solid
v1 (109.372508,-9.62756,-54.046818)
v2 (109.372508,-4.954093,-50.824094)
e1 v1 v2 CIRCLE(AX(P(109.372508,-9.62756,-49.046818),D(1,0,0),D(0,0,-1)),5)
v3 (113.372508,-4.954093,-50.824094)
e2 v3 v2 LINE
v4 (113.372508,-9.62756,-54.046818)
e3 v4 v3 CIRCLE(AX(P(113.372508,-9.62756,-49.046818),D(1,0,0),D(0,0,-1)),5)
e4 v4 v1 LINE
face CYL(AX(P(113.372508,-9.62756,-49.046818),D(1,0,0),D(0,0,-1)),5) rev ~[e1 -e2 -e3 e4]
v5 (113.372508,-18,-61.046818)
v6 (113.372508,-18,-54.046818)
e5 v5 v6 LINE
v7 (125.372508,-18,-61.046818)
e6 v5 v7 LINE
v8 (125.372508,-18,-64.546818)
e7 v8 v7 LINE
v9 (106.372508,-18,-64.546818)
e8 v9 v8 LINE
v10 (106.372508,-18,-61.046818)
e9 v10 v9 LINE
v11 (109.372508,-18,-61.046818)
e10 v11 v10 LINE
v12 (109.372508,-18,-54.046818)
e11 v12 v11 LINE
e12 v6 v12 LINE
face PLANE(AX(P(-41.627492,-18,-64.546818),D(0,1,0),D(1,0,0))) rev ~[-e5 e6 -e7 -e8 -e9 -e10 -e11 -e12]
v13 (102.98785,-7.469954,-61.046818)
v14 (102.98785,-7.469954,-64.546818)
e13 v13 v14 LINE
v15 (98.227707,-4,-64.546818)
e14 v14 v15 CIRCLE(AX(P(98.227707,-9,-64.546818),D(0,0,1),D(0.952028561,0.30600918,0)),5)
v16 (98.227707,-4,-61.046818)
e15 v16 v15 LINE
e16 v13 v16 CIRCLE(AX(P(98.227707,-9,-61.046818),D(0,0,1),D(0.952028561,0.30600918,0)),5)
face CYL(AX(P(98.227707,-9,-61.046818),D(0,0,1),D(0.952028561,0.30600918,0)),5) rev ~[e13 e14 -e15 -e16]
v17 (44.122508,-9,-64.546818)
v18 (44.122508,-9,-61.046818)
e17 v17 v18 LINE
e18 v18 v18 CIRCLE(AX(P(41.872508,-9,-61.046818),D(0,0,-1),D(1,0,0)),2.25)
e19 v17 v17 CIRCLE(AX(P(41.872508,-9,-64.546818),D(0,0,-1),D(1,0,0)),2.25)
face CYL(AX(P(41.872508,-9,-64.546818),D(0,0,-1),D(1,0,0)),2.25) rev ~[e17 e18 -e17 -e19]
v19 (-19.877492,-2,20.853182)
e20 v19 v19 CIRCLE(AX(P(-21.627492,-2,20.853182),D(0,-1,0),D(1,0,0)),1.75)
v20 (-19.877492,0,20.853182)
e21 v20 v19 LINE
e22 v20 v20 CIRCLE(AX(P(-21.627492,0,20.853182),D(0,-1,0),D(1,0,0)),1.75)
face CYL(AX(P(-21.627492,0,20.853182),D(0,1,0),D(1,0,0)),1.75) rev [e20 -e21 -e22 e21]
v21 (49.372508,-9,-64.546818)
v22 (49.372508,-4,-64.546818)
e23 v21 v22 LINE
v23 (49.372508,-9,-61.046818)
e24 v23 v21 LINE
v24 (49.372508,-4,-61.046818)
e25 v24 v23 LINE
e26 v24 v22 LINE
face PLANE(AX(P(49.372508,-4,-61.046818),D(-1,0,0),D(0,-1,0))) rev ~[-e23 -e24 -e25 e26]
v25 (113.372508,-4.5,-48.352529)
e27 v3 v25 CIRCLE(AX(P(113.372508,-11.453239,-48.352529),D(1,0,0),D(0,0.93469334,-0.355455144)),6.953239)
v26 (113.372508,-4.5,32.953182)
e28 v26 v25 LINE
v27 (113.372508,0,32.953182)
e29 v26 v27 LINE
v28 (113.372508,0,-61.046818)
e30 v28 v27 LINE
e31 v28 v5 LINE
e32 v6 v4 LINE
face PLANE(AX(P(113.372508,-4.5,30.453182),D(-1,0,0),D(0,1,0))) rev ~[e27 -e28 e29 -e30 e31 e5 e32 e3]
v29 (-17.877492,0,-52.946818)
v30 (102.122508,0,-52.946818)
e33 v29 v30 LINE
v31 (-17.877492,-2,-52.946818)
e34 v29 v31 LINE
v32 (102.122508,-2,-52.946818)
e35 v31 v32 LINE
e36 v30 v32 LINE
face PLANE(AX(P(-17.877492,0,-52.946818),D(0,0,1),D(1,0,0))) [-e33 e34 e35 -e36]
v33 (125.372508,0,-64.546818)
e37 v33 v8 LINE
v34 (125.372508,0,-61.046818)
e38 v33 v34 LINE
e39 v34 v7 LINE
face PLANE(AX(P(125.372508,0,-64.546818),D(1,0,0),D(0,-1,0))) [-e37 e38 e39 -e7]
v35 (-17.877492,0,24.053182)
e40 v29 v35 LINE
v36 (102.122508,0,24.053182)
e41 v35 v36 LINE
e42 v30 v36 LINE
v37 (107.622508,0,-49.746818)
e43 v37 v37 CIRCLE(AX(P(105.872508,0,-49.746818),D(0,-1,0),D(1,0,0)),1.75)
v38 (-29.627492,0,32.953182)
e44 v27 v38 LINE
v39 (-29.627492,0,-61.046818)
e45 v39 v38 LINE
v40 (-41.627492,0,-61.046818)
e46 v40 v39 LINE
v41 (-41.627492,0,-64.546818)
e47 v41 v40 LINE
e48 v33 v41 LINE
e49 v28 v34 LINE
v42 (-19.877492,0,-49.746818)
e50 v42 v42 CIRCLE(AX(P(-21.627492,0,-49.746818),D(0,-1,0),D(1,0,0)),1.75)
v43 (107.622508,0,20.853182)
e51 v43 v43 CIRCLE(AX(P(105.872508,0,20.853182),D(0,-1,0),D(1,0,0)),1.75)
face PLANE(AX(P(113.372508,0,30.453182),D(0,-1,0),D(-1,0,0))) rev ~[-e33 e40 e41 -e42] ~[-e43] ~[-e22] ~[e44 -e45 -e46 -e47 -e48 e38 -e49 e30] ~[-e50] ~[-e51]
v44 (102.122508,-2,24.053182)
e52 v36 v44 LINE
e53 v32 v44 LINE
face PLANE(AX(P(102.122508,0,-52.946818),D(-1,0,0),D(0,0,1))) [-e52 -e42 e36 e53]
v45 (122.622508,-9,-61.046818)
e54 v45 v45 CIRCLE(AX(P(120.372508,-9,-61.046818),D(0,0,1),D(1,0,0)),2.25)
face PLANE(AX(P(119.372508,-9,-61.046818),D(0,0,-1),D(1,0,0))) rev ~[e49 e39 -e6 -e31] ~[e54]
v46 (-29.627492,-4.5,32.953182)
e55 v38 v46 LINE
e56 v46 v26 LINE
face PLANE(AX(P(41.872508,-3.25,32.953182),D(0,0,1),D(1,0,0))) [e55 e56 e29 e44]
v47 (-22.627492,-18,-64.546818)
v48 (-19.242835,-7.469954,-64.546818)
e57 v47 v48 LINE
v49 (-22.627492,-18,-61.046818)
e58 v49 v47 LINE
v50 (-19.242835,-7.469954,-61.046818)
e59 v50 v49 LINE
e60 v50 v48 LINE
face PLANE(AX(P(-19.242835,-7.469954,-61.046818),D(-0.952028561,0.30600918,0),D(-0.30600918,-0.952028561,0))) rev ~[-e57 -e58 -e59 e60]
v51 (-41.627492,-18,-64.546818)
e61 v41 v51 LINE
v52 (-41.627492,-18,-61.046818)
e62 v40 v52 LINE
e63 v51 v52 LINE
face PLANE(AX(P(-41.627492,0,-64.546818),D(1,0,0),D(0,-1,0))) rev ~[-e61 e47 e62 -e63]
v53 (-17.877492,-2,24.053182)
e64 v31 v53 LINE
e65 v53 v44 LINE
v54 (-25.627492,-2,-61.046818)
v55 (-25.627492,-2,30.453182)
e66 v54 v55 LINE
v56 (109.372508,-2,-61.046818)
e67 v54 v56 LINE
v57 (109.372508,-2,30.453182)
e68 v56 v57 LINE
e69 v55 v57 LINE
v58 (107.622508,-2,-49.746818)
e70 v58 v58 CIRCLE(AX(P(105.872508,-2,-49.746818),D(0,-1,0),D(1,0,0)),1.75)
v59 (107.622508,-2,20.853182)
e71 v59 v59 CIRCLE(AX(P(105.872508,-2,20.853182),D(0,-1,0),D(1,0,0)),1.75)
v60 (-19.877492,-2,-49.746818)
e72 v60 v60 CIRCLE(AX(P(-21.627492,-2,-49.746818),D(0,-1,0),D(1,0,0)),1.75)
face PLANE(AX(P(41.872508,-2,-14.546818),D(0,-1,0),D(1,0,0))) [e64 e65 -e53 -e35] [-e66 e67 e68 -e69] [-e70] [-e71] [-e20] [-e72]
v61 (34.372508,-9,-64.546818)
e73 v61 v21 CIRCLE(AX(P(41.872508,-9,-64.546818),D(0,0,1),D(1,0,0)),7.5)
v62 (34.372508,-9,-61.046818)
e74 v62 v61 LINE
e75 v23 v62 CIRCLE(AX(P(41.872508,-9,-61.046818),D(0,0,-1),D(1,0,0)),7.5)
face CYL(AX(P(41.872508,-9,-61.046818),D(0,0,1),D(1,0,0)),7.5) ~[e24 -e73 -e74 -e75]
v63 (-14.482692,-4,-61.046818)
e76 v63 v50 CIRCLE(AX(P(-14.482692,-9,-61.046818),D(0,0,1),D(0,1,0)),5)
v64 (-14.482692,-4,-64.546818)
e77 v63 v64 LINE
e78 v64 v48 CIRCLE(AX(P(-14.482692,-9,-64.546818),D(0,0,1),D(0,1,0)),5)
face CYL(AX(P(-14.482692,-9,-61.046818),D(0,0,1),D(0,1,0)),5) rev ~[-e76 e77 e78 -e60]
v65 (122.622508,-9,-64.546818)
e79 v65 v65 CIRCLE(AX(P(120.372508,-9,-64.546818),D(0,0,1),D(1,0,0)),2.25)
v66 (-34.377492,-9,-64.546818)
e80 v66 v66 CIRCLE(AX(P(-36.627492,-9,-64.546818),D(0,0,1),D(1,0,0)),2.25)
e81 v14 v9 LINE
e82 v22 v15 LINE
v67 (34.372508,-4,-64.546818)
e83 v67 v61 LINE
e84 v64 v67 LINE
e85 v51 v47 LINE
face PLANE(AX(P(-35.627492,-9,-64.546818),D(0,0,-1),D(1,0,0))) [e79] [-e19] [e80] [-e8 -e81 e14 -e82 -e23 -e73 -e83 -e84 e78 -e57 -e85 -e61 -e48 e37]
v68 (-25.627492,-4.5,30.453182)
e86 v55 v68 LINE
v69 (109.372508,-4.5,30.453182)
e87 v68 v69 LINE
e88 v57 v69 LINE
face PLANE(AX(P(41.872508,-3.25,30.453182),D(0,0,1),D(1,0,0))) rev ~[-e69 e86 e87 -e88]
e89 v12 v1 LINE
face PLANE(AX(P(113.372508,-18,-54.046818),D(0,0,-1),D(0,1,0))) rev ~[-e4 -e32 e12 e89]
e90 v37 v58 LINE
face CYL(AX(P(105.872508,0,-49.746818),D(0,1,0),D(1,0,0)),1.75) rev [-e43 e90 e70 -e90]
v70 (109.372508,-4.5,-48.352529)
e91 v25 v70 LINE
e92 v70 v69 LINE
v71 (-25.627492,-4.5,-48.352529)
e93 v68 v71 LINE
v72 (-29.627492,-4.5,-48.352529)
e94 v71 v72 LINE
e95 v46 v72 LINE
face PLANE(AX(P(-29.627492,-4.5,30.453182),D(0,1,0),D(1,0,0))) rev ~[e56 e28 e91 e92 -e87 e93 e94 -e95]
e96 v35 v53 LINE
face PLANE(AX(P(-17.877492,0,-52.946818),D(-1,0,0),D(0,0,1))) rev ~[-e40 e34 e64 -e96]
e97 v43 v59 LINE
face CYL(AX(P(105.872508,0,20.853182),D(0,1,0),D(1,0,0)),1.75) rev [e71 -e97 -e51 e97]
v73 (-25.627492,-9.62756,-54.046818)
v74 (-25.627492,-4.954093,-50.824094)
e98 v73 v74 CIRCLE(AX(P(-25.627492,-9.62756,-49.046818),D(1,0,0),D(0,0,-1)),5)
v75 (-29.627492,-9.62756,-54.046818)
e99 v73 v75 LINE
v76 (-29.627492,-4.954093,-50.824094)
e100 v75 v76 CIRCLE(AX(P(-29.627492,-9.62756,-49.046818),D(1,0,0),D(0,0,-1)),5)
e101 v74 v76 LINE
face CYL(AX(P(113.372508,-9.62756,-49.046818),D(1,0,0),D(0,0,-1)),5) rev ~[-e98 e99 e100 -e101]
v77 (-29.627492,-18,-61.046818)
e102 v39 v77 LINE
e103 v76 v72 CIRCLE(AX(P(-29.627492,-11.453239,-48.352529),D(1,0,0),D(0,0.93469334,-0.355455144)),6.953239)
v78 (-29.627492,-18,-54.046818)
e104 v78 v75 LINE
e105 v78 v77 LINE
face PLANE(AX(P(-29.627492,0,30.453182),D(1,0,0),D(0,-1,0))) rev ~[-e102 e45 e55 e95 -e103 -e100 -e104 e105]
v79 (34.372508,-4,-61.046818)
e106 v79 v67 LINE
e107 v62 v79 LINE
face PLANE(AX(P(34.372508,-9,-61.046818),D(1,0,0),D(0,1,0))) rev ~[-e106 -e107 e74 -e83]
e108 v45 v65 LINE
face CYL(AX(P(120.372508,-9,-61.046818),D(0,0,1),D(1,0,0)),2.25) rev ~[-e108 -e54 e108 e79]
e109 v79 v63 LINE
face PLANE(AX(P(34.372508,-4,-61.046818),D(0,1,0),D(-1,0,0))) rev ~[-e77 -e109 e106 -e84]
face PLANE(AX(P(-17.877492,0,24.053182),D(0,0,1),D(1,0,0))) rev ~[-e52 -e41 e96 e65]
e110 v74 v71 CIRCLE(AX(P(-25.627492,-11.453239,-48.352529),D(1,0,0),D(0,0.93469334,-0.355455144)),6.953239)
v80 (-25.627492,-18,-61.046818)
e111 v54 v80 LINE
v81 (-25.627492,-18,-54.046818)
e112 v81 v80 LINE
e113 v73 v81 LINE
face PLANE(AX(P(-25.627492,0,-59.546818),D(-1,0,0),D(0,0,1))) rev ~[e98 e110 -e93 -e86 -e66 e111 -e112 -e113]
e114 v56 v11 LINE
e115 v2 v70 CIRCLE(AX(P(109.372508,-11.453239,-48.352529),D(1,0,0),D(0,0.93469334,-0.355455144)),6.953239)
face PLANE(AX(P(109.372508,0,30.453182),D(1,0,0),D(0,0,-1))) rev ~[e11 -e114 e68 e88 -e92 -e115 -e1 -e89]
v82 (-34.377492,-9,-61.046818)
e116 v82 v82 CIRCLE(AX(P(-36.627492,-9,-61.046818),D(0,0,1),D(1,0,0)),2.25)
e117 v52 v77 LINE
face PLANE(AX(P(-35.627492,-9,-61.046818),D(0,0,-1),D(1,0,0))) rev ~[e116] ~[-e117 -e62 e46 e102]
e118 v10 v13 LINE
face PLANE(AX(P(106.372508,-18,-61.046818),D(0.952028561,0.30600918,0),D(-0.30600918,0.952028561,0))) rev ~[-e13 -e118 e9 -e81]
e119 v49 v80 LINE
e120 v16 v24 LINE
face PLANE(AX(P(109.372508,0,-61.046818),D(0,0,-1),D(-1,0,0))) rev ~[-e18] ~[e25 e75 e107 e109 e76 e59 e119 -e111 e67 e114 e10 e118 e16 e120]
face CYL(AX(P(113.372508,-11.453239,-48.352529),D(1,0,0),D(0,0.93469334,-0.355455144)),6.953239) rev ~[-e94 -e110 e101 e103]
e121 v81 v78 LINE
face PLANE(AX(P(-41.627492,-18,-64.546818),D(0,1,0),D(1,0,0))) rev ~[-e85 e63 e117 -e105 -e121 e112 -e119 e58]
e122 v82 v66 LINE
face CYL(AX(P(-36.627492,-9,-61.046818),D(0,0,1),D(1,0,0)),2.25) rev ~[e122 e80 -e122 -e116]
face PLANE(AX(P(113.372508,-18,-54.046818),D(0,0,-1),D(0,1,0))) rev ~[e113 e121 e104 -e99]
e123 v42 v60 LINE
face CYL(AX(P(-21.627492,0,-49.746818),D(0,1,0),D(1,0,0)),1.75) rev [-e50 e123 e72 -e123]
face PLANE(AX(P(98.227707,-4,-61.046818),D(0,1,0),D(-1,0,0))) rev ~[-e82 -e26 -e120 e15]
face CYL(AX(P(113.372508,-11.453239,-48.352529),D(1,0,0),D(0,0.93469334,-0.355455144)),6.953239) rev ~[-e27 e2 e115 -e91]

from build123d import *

# Parameters (mm, degrees)
F0_W      = 135
F0_H      = 90
F0_R      = 1.75
F0_W_2    = 120
F0_H_2    = 77
F1_DEPTH  = 2
F2_DEPTH  = 18
F3_R      = 2.25
F4_DEPTH  = 25
F5_DEPTH  = 1.5
F7_DEPTH  = 143.001
F8_W      = 12
F8_H      = 18
F9_DEPTH  = 3.5
F10_R     = 2.25
F11_DEPTH = 3.501
F12_R     = 2.25
F13_DEPTH = 3.501
F14_W     = 135
F14_H     = 2.5
F15_DEPTH = 2.5


# Not quite as in the source:
# - a feature names something its author has since deleted; it is built from what else it names


with BuildPart() as f1:
    # F0 (on Front) → F1 (new body)
    with BuildSketch(Plane.XZ):
        with Locations((41.872507602, -14.5468179137)):
            Rectangle(F0_W, F0_H)
        with Locations((-21.627492398, -49.7468179137)):
            Circle(F0_R, mode=Mode.SUBTRACT)
        with Locations((105.872507602, -49.7468179137)):
            Circle(F0_R, mode=Mode.SUBTRACT)
        with Locations((-21.627492398, 20.8531820863)):
            Circle(F0_R, mode=Mode.SUBTRACT)
        with Locations((42.122507602, -14.4468179137)):
            Rectangle(F0_W_2, F0_H_2, mode=Mode.SUBTRACT)
        with Locations((105.872507602, 20.8531820863)):
            Circle(F0_R, mode=Mode.SUBTRACT)
    extrude(amount=F1_DEPTH)

    # F0 (on Front) → F2 (join)
    with BuildSketch(Plane.XZ):
        Polygon((-25.627492398, -59.5468179137), (-25.627492398, 30.4531820863), (-29.627492398, 30.4531820863), (-29.627492398, -64.5468179137), (113.372507602, -64.5468179137), (113.372507602, 30.4531820863), (109.372507602, 30.4531820863), (109.372507602, -59.5468179137), align=None)
    extrude(amount=F2_DEPTH)

    # F3 (on face) → F4 (cut)
    with BuildSketch(Plane(origin=(0, 0, -64.5468179137), x_dir=(1, 0, 0), z_dir=(0, 0, -1))):
        with Locations((-9.627492398, 9)):
            Circle(F3_R)
        with Locations((41.872507602, 9)):
            Circle(F3_R)
        with Locations((93.372507602, 9)):
            Circle(F3_R)
    extrude(amount=-F4_DEPTH, mode=Mode.SUBTRACT)

    # F5 (cut): a face of the model
    f5_faces = [f1.faces().sort_by_distance(p)[0] for p in [
        (41.872507602, -3.3594484176, -59.5468179137),
    ]]
    extrude(f5_faces, amount=-F5_DEPTH, mode=Mode.SUBTRACT)

    # F6 (on face) → F7 (cut, through all)
    with BuildSketch(Plane.YZ.offset(113.372507602)):
        with BuildLine():
            Line((-18, 30.4531820863), (-18, -54.0468179137))
            Line((-18, -54.0468179137), (-9.6275595227, -54.0468179137))
            ThreePointArc((-9.6275595227, -54.0468179137), (-6.7891073566, -53.1630284647), (-4.9540928207, -50.8240936338))
            ThreePointArc((-4.9540928207, -50.8240936338), (-4.6144653792, -49.6089954864), (-4.5, -48.3525290189))
            Line((-4.5, -48.3525290189), (-4.5, 30.4531820863))
            Line((-4.5, 30.4531820863), (-18, 30.4531820863))
        make_face()
    extrude(amount=-F7_DEPTH, mode=Mode.SUBTRACT)

    # F8 (on face) → F9 (join, through all)
    with BuildSketch(Plane(origin=(0, 0, -64.5468179137), x_dir=(1, 0, 0), z_dir=(0, 0, -1))):
        with Locations((-35.627492398, 9)):
            Rectangle(F8_W, F8_H)
        with Locations((119.372507602, 9)):
            Rectangle(F8_W, F8_H)
    extrude(amount=-F9_DEPTH)

    # F10 (on face) → F11 (cut, through all)
    with BuildSketch(Plane.XY.offset(-61.0468179137)):
        with Locations((-36.627492398, -9)):
            Circle(F10_R)
        with Locations((120.372507602, -9)):
            Circle(F10_R)
    extrude(amount=-F11_DEPTH, mode=Mode.SUBTRACT)

    # F12 (on face) → F13 (cut, through all)
    with BuildSketch(Plane.XY.offset(-61.0468179137)):
        with BuildLine():
            Line((34.372507602, -4), (-14.4826919802, -4))
            ThreePointArc((-14.4826919802, -4), (-17.4280077943, -4.959565029), (-19.2428347866, -7.4699540979))
            Line((-19.2428347866, -7.4699540979), (-22.627492398, -18))
            Line((-22.627492398, -18), (106.372507602, -18))
            Line((106.372507602, -18), (102.9878499906, -7.4699540979))
            ThreePointArc((102.9878499906, -7.4699540979), (101.1730229983, -4.959565029), (98.2277071842, -4))
            Line((98.2277071842, -4), (49.372507602, -4))
            Line((49.372507602, -4), (49.372507602, -9))
            ThreePointArc((49.372507602, -9), (41.872507602, -16.5), (34.372507602, -9))
            Line((34.372507602, -9), (34.372507602, -4))
        make_face()
        with Locations((-9.627492398, -9)):
            Circle(F12_R, mode=Mode.SUBTRACT)
        with Locations((93.372507602, -9)):
            Circle(F12_R, mode=Mode.SUBTRACT)
    extrude(amount=-F13_DEPTH, mode=Mode.SUBTRACT)

    # F14 (on face) → F15 (join)
    with BuildSketch(Plane.XY.offset(30.4531820863)):
        with Locations((41.872507602, -3.25)):
            Rectangle(F14_W, F14_H)
        Polygon((-29.627492398, -4.5), (-25.627492398, -4.5), (-25.627492398, -2), (109.372507602, -2), (109.372507602, -4.5), (113.372507602, -4.5), (113.372507602, 0), (-29.627492398, 0), align=None)
    extrude(amount=F15_DEPTH)


solid = f1.part
